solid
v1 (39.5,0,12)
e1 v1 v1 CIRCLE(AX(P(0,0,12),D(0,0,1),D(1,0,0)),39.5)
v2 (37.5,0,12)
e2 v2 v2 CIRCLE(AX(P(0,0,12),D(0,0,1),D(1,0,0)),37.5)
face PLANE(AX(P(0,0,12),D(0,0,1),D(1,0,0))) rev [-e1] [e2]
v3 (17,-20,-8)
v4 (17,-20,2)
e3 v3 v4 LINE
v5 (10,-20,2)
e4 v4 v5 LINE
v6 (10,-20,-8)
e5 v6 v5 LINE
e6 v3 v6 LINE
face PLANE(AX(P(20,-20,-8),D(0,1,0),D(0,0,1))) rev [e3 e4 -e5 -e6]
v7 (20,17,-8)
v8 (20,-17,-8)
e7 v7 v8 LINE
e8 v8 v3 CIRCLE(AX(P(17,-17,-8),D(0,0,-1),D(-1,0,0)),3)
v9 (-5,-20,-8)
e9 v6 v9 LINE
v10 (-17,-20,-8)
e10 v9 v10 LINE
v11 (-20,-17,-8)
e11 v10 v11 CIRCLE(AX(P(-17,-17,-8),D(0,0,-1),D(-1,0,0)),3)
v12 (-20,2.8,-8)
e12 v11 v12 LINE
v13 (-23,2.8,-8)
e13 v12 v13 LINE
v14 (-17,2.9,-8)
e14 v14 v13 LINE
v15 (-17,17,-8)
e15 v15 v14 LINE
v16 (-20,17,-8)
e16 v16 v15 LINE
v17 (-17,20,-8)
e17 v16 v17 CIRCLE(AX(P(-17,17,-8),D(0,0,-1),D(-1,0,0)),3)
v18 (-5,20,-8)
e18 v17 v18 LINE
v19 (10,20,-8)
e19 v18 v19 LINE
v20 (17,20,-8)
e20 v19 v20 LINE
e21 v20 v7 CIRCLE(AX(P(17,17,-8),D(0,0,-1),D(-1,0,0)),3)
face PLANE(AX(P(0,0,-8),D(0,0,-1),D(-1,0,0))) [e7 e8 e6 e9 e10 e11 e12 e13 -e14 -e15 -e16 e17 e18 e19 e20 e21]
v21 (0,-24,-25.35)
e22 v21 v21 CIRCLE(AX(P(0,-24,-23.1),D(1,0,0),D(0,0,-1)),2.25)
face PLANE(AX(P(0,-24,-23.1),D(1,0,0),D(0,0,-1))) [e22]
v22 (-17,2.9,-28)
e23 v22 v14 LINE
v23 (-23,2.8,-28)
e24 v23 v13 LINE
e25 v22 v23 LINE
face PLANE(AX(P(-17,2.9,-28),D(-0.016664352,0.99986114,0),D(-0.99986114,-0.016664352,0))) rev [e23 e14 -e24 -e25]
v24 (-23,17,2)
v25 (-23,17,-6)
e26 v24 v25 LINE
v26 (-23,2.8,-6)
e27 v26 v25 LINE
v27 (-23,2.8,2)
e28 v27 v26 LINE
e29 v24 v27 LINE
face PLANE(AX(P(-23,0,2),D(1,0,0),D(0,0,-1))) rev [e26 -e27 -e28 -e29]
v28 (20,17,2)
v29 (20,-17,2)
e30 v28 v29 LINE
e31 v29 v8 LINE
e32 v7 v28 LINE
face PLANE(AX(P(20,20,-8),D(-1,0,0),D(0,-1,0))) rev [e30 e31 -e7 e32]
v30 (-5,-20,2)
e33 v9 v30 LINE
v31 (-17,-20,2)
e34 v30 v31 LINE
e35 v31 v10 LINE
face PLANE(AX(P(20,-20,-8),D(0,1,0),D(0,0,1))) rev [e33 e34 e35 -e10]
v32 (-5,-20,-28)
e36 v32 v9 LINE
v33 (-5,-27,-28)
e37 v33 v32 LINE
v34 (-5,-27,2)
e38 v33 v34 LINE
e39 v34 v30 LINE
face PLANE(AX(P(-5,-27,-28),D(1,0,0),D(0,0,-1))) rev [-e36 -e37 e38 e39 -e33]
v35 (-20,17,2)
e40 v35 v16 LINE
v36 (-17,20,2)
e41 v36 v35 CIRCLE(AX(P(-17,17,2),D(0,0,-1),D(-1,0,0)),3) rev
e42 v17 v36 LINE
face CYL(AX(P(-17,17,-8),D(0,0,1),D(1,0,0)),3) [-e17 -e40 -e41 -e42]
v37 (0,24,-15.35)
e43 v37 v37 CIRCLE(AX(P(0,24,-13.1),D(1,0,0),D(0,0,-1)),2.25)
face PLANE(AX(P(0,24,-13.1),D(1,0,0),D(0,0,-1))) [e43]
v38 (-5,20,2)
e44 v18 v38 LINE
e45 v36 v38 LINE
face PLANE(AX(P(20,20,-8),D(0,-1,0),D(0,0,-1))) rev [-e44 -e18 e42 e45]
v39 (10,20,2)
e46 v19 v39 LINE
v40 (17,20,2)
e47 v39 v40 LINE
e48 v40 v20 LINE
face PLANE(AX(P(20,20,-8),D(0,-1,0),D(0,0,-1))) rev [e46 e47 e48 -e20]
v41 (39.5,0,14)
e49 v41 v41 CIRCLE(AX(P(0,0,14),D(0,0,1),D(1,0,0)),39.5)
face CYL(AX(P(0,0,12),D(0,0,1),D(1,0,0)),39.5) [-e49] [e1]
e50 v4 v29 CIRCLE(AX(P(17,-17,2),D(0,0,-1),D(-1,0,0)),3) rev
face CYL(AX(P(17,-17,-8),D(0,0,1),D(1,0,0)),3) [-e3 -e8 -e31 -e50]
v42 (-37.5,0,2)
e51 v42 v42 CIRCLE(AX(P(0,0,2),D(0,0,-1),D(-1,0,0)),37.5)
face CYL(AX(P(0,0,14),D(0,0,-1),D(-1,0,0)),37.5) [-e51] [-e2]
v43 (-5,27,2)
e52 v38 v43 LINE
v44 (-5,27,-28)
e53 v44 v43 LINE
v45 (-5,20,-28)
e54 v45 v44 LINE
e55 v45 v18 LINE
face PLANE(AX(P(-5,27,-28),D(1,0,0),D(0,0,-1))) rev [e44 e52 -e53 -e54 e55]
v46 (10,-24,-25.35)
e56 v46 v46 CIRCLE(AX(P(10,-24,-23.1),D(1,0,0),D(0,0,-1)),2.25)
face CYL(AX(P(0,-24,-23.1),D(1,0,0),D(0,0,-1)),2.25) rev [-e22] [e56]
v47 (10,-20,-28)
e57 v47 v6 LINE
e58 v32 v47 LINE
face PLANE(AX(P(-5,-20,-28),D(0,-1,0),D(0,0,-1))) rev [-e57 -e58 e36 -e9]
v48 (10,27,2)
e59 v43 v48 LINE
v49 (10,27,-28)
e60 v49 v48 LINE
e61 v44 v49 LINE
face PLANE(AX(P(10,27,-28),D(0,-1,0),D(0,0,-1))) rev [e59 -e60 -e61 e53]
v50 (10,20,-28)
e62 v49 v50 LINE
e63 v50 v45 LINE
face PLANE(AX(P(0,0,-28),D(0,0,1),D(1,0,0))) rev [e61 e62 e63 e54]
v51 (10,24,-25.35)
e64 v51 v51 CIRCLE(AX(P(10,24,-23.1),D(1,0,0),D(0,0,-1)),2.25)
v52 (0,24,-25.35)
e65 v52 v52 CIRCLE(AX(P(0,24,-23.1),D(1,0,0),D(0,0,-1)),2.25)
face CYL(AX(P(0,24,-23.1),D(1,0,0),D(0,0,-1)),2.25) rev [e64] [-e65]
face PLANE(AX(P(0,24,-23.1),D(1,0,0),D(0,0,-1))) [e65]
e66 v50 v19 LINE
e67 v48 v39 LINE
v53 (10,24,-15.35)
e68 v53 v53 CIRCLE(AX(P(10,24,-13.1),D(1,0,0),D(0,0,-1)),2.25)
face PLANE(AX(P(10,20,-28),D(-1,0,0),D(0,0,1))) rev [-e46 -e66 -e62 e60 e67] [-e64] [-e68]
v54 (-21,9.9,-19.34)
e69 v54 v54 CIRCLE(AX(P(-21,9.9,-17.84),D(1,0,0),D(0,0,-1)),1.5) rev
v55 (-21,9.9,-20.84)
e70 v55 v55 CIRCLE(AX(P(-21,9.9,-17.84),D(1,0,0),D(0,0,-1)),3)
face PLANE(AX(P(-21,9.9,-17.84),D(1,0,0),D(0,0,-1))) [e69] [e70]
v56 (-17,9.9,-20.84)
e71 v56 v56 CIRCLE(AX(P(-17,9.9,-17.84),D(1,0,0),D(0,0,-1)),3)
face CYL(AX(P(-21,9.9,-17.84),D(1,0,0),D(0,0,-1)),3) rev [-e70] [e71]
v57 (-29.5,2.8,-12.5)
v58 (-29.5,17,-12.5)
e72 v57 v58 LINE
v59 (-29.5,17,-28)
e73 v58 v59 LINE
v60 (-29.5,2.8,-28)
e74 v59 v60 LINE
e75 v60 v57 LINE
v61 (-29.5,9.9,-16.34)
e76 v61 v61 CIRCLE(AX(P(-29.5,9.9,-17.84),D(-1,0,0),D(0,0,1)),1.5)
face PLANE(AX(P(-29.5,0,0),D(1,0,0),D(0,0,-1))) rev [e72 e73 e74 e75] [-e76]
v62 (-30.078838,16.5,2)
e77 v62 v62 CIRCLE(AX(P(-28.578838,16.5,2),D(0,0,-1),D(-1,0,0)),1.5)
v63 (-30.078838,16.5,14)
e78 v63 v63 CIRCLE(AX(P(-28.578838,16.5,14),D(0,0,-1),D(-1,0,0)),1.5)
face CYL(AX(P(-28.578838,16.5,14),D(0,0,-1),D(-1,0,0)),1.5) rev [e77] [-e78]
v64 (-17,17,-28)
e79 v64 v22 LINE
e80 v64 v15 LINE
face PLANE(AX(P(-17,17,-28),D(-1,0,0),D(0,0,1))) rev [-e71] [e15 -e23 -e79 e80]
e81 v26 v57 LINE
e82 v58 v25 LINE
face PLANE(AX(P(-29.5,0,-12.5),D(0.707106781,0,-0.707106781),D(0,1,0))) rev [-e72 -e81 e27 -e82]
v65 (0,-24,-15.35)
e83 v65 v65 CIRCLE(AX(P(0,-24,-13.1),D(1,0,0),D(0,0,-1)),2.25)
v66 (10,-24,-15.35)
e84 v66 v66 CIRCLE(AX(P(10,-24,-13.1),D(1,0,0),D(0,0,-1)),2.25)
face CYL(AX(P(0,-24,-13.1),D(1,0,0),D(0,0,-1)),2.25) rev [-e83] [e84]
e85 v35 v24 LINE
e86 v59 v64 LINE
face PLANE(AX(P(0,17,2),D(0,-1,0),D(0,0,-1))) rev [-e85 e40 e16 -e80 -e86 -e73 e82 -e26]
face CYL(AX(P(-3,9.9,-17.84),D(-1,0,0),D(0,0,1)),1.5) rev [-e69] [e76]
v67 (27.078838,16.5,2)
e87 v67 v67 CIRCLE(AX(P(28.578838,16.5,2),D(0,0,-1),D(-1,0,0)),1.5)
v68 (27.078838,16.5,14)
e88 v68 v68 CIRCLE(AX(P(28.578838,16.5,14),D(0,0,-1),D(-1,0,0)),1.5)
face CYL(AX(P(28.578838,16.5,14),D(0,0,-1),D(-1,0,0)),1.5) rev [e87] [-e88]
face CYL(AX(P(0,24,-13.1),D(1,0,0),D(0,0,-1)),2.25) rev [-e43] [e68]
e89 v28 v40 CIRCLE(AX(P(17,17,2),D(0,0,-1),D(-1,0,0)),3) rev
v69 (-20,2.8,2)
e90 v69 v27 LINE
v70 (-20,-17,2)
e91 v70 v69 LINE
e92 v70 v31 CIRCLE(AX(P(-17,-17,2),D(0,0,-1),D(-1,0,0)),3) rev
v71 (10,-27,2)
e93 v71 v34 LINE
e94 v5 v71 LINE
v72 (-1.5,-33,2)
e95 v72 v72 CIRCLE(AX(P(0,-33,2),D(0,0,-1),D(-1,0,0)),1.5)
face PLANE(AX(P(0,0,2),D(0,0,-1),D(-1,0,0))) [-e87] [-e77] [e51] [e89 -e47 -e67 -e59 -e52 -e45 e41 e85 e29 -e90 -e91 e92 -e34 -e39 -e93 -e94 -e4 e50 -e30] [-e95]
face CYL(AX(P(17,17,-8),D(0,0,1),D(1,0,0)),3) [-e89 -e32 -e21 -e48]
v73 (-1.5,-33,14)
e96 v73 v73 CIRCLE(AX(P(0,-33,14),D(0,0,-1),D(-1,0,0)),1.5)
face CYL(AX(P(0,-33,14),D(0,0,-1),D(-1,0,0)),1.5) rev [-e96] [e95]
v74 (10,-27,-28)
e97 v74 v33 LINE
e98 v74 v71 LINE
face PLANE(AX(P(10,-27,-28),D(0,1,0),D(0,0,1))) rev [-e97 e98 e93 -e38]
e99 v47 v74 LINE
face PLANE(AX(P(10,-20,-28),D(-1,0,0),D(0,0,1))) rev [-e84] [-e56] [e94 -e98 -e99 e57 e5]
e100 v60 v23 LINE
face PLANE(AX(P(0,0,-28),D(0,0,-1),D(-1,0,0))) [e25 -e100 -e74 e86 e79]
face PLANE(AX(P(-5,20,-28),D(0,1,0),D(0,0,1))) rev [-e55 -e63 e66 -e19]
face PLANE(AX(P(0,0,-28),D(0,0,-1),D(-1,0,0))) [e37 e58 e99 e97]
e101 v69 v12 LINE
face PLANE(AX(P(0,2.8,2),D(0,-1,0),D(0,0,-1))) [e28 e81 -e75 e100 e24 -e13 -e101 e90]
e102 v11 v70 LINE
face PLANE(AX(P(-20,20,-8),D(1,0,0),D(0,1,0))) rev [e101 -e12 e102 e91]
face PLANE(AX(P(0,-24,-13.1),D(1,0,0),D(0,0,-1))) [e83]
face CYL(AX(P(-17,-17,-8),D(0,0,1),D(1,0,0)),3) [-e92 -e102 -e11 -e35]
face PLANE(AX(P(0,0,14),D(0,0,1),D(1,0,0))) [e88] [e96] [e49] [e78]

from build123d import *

# Parameters (mm, degrees)
SKETCH_1_R          = 37.5
EXTRUDE_3_DEPTH     = 14
SKETCH_2_R          = 39.5
SKETCH_2_R_2        = 37.5
EXTRUDE_4_DEPTH     = 2
EXTRUDE_START       = -2
SKETCH_3_R          = 39.5
SKETCH_3_R_2        = 37.5
EXTRUDE_5_DEPTH     = 2
SKETCH_4_R          = 39.5
CUT_EXTRUDE_1_DEPTH = 2
SKETCH_5_R          = 1.5
CUT_EXTRUDE_3_DEPTH = 58.135803136
SKETCH_6_W          = 40
SKETCH_6_H          = 40
EXTRUDE_6_DEPTH     = 10
SKETCH_7_W          = 15
SKETCH_7_H          = 7
EXTRUDE_7_DEPTH     = 30
SKETCH_8_W          = 3
SKETCH_8_H          = 14.2
EXTRUDE_9_DEPTH     = 10
EXTRUDE_10_DEPTH    = 20
SKETCH_10_R         = 1.5
CUT_EXTRUDE_4_DEPTH = 20
FILLET_1_R          = 3
EXTRUDE_START_2     = 6.5
SKETCH_11_W         = 22
SKETCH_11_H         = 14.2
SKETCH_11_R         = 1.5
EXTRUDE_11_DEPTH    = 6.5
CHAMFER_1_SIZE      = 6.5
SKETCH_12_R         = 3
CUT_EXTRUDE_5_DEPTH = 4
SKETCH_13_R         = 2.25
CUT_EXTRUDE_6_DEPTH = 10
SKETCH_15_R         = 2.25
CUT_EXTRUDE_7_DEPTH = 10


with BuildPart() as part:
    # 草图1 → 凸台-拉伸3 (new body)
    with BuildSketch(Plane.XY):
        Circle(SKETCH_1_R)
    extrude(amount=EXTRUDE_3_DEPTH)

    # 草图2 → 凸台-拉伸4 (add)
    with BuildSketch(Plane(origin=(0, 0, 0), x_dir=(-1, 0, 0), z_dir=(0, 0, -1))):
        Circle(SKETCH_2_R)
        Circle(SKETCH_2_R_2, mode=Mode.SUBTRACT)
    extrude(amount=-EXTRUDE_4_DEPTH)

    # 草图3 → 凸台-拉伸5 (add)
    with BuildSketch(Plane.XY.offset(14).offset(EXTRUDE_START)):
        with Locations(Location((0, 0, 0), (0, 0, 180))):
            Circle(SKETCH_3_R)
        with Locations(Location((0, 0, 0), (0, 0, 180))):
            Circle(SKETCH_3_R_2, mode=Mode.SUBTRACT)
    extrude(amount=EXTRUDE_5_DEPTH)

    # 草图4 → 切除-拉伸1 (cut)
    with BuildSketch(Plane(origin=(0, 0, 0), x_dir=(-1, 0, 0), z_dir=(0, 0, -1))):
        with Locations(Location((0, 0, 0), (0, 0, 180))):
            Circle(SKETCH_4_R)
    extrude(amount=-CUT_EXTRUDE_1_DEPTH, mode=Mode.SUBTRACT)

    # 草图5 → 切除-拉伸3 (cut, through all)
    with BuildSketch(Plane(origin=(0, 0, 2), x_dir=(-1, 0, 0), z_dir=(0, 0, -1))):
        with Locations((0, -33)):
            Circle(SKETCH_5_R)
        with Locations((-28.578838325, 16.5)):
            Circle(SKETCH_5_R)
        with Locations((28.578838325, 16.5)):
            Circle(SKETCH_5_R)
    extrude(amount=-CUT_EXTRUDE_3_DEPTH, mode=Mode.SUBTRACT)

    # 草图6 → 凸台-拉伸6 (add)
    with BuildSketch(Plane(origin=(0, 0, 2), x_dir=(-1, 0, 0), z_dir=(0, 0, -1))):
        Rectangle(SKETCH_6_W, SKETCH_6_H)
    extrude(amount=EXTRUDE_6_DEPTH)

    # 草图7 → 凸台-拉伸7 (add)
    with BuildSketch(Plane(origin=(0, 0, 2), x_dir=(-1, 0, 0), z_dir=(0, 0, -1))):
        with Locations((-2.5, -23.5)):
            Rectangle(SKETCH_7_W, SKETCH_7_H)
        with Locations((-2.5, 23.5)):
            Rectangle(SKETCH_7_W, SKETCH_7_H)
    extrude(amount=EXTRUDE_7_DEPTH)

    # 草图8 → 凸台-拉伸9 (add)
    with BuildSketch(Plane(origin=(0, 0, -8), x_dir=(-1, 0, 0), z_dir=(0, 0, -1))):
        with Locations((21.5, 9.9)):
            Rectangle(SKETCH_8_W, SKETCH_8_H)
        with Locations((18.5, 9.9)):
            Rectangle(SKETCH_8_W, SKETCH_8_H)
    extrude(amount=-EXTRUDE_9_DEPTH)

    # 草图9 → 凸台-拉伸10 (add)
    with BuildSketch(Plane(origin=(0, 0, -8), x_dir=(-1, 0, 0), z_dir=(0, 0, -1))):
        Polygon((23, 17), (17, 17), (17, 2.9), (23, 2.8), align=None)
    extrude(amount=EXTRUDE_10_DEPTH)

    # 草图10 → 切除-拉伸4 (cut)
    with BuildSketch(Plane.ZY.offset(23)):
        with Locations((-17.84, 9.9)):
            Circle(SKETCH_10_R)
    extrude(amount=-CUT_EXTRUDE_4_DEPTH, mode=Mode.SUBTRACT)

    # 圆角1
    fillet_1_edges = [part.edges().sort_by_distance(p)[0] for p in [
        (-20, -20, -3),
        (-20, 20, -3),
        (20, 20, -3),
        (20, -20, -3),
    ]]
    fillet(fillet_1_edges, radius=FILLET_1_R - 0.0001)  # a hair under: the kernel refuses the full size

    # 草图11 → 凸台-拉伸11 (add)
    with BuildSketch(Plane.ZY.offset(23).offset(EXTRUDE_START_2)):
        with Locations((-17, 9.9)):
            Rectangle(SKETCH_11_W, SKETCH_11_H)
        with Locations((-17.84, 9.9)):
            Circle(SKETCH_11_R, mode=Mode.SUBTRACT)
    extrude(amount=-EXTRUDE_11_DEPTH)

    # 倒角1
    chamfer_1_edges = [part.edges().sort_by_distance(p)[0] for p in [
        (-29.5, 9.9, -6),
    ]]
    chamfer(chamfer_1_edges, length=CHAMFER_1_SIZE - 0.0001)  # a hair under: the kernel refuses the full size

    # 草图12 → 切除-拉伸5 (cut)
    with BuildSketch(Plane(origin=(-17, 0, 0), x_dir=(0, 0, -1), z_dir=(1, 0, 0))):
        with Locations((17.84, 9.9)):
            Circle(SKETCH_12_R)
    extrude(amount=-CUT_EXTRUDE_5_DEPTH, mode=Mode.SUBTRACT)

    # 草图13 → 切除-拉伸6 (cut)
    with BuildSketch(Plane(origin=(10, 0, 0), x_dir=(0, 0, -1), z_dir=(1, 0, 0))):
        with Locations((23.1, -24)):
            Circle(SKETCH_13_R)
        with Locations((13.1, -24)):
            Circle(SKETCH_13_R)
    extrude(amount=-CUT_EXTRUDE_6_DEPTH, mode=Mode.SUBTRACT)

    # 草图15 → 切除-拉伸7 (cut)
    with BuildSketch(Plane(origin=(10, 0, 0), x_dir=(0, 0, -1), z_dir=(1, 0, 0))):
        with Locations((23.1, 24)):
            Circle(SKETCH_15_R)
        with Locations((13.1, 24)):
            Circle(SKETCH_15_R)
    extrude(amount=-CUT_EXTRUDE_7_DEPTH, mode=Mode.SUBTRACT)


solid = part.part
